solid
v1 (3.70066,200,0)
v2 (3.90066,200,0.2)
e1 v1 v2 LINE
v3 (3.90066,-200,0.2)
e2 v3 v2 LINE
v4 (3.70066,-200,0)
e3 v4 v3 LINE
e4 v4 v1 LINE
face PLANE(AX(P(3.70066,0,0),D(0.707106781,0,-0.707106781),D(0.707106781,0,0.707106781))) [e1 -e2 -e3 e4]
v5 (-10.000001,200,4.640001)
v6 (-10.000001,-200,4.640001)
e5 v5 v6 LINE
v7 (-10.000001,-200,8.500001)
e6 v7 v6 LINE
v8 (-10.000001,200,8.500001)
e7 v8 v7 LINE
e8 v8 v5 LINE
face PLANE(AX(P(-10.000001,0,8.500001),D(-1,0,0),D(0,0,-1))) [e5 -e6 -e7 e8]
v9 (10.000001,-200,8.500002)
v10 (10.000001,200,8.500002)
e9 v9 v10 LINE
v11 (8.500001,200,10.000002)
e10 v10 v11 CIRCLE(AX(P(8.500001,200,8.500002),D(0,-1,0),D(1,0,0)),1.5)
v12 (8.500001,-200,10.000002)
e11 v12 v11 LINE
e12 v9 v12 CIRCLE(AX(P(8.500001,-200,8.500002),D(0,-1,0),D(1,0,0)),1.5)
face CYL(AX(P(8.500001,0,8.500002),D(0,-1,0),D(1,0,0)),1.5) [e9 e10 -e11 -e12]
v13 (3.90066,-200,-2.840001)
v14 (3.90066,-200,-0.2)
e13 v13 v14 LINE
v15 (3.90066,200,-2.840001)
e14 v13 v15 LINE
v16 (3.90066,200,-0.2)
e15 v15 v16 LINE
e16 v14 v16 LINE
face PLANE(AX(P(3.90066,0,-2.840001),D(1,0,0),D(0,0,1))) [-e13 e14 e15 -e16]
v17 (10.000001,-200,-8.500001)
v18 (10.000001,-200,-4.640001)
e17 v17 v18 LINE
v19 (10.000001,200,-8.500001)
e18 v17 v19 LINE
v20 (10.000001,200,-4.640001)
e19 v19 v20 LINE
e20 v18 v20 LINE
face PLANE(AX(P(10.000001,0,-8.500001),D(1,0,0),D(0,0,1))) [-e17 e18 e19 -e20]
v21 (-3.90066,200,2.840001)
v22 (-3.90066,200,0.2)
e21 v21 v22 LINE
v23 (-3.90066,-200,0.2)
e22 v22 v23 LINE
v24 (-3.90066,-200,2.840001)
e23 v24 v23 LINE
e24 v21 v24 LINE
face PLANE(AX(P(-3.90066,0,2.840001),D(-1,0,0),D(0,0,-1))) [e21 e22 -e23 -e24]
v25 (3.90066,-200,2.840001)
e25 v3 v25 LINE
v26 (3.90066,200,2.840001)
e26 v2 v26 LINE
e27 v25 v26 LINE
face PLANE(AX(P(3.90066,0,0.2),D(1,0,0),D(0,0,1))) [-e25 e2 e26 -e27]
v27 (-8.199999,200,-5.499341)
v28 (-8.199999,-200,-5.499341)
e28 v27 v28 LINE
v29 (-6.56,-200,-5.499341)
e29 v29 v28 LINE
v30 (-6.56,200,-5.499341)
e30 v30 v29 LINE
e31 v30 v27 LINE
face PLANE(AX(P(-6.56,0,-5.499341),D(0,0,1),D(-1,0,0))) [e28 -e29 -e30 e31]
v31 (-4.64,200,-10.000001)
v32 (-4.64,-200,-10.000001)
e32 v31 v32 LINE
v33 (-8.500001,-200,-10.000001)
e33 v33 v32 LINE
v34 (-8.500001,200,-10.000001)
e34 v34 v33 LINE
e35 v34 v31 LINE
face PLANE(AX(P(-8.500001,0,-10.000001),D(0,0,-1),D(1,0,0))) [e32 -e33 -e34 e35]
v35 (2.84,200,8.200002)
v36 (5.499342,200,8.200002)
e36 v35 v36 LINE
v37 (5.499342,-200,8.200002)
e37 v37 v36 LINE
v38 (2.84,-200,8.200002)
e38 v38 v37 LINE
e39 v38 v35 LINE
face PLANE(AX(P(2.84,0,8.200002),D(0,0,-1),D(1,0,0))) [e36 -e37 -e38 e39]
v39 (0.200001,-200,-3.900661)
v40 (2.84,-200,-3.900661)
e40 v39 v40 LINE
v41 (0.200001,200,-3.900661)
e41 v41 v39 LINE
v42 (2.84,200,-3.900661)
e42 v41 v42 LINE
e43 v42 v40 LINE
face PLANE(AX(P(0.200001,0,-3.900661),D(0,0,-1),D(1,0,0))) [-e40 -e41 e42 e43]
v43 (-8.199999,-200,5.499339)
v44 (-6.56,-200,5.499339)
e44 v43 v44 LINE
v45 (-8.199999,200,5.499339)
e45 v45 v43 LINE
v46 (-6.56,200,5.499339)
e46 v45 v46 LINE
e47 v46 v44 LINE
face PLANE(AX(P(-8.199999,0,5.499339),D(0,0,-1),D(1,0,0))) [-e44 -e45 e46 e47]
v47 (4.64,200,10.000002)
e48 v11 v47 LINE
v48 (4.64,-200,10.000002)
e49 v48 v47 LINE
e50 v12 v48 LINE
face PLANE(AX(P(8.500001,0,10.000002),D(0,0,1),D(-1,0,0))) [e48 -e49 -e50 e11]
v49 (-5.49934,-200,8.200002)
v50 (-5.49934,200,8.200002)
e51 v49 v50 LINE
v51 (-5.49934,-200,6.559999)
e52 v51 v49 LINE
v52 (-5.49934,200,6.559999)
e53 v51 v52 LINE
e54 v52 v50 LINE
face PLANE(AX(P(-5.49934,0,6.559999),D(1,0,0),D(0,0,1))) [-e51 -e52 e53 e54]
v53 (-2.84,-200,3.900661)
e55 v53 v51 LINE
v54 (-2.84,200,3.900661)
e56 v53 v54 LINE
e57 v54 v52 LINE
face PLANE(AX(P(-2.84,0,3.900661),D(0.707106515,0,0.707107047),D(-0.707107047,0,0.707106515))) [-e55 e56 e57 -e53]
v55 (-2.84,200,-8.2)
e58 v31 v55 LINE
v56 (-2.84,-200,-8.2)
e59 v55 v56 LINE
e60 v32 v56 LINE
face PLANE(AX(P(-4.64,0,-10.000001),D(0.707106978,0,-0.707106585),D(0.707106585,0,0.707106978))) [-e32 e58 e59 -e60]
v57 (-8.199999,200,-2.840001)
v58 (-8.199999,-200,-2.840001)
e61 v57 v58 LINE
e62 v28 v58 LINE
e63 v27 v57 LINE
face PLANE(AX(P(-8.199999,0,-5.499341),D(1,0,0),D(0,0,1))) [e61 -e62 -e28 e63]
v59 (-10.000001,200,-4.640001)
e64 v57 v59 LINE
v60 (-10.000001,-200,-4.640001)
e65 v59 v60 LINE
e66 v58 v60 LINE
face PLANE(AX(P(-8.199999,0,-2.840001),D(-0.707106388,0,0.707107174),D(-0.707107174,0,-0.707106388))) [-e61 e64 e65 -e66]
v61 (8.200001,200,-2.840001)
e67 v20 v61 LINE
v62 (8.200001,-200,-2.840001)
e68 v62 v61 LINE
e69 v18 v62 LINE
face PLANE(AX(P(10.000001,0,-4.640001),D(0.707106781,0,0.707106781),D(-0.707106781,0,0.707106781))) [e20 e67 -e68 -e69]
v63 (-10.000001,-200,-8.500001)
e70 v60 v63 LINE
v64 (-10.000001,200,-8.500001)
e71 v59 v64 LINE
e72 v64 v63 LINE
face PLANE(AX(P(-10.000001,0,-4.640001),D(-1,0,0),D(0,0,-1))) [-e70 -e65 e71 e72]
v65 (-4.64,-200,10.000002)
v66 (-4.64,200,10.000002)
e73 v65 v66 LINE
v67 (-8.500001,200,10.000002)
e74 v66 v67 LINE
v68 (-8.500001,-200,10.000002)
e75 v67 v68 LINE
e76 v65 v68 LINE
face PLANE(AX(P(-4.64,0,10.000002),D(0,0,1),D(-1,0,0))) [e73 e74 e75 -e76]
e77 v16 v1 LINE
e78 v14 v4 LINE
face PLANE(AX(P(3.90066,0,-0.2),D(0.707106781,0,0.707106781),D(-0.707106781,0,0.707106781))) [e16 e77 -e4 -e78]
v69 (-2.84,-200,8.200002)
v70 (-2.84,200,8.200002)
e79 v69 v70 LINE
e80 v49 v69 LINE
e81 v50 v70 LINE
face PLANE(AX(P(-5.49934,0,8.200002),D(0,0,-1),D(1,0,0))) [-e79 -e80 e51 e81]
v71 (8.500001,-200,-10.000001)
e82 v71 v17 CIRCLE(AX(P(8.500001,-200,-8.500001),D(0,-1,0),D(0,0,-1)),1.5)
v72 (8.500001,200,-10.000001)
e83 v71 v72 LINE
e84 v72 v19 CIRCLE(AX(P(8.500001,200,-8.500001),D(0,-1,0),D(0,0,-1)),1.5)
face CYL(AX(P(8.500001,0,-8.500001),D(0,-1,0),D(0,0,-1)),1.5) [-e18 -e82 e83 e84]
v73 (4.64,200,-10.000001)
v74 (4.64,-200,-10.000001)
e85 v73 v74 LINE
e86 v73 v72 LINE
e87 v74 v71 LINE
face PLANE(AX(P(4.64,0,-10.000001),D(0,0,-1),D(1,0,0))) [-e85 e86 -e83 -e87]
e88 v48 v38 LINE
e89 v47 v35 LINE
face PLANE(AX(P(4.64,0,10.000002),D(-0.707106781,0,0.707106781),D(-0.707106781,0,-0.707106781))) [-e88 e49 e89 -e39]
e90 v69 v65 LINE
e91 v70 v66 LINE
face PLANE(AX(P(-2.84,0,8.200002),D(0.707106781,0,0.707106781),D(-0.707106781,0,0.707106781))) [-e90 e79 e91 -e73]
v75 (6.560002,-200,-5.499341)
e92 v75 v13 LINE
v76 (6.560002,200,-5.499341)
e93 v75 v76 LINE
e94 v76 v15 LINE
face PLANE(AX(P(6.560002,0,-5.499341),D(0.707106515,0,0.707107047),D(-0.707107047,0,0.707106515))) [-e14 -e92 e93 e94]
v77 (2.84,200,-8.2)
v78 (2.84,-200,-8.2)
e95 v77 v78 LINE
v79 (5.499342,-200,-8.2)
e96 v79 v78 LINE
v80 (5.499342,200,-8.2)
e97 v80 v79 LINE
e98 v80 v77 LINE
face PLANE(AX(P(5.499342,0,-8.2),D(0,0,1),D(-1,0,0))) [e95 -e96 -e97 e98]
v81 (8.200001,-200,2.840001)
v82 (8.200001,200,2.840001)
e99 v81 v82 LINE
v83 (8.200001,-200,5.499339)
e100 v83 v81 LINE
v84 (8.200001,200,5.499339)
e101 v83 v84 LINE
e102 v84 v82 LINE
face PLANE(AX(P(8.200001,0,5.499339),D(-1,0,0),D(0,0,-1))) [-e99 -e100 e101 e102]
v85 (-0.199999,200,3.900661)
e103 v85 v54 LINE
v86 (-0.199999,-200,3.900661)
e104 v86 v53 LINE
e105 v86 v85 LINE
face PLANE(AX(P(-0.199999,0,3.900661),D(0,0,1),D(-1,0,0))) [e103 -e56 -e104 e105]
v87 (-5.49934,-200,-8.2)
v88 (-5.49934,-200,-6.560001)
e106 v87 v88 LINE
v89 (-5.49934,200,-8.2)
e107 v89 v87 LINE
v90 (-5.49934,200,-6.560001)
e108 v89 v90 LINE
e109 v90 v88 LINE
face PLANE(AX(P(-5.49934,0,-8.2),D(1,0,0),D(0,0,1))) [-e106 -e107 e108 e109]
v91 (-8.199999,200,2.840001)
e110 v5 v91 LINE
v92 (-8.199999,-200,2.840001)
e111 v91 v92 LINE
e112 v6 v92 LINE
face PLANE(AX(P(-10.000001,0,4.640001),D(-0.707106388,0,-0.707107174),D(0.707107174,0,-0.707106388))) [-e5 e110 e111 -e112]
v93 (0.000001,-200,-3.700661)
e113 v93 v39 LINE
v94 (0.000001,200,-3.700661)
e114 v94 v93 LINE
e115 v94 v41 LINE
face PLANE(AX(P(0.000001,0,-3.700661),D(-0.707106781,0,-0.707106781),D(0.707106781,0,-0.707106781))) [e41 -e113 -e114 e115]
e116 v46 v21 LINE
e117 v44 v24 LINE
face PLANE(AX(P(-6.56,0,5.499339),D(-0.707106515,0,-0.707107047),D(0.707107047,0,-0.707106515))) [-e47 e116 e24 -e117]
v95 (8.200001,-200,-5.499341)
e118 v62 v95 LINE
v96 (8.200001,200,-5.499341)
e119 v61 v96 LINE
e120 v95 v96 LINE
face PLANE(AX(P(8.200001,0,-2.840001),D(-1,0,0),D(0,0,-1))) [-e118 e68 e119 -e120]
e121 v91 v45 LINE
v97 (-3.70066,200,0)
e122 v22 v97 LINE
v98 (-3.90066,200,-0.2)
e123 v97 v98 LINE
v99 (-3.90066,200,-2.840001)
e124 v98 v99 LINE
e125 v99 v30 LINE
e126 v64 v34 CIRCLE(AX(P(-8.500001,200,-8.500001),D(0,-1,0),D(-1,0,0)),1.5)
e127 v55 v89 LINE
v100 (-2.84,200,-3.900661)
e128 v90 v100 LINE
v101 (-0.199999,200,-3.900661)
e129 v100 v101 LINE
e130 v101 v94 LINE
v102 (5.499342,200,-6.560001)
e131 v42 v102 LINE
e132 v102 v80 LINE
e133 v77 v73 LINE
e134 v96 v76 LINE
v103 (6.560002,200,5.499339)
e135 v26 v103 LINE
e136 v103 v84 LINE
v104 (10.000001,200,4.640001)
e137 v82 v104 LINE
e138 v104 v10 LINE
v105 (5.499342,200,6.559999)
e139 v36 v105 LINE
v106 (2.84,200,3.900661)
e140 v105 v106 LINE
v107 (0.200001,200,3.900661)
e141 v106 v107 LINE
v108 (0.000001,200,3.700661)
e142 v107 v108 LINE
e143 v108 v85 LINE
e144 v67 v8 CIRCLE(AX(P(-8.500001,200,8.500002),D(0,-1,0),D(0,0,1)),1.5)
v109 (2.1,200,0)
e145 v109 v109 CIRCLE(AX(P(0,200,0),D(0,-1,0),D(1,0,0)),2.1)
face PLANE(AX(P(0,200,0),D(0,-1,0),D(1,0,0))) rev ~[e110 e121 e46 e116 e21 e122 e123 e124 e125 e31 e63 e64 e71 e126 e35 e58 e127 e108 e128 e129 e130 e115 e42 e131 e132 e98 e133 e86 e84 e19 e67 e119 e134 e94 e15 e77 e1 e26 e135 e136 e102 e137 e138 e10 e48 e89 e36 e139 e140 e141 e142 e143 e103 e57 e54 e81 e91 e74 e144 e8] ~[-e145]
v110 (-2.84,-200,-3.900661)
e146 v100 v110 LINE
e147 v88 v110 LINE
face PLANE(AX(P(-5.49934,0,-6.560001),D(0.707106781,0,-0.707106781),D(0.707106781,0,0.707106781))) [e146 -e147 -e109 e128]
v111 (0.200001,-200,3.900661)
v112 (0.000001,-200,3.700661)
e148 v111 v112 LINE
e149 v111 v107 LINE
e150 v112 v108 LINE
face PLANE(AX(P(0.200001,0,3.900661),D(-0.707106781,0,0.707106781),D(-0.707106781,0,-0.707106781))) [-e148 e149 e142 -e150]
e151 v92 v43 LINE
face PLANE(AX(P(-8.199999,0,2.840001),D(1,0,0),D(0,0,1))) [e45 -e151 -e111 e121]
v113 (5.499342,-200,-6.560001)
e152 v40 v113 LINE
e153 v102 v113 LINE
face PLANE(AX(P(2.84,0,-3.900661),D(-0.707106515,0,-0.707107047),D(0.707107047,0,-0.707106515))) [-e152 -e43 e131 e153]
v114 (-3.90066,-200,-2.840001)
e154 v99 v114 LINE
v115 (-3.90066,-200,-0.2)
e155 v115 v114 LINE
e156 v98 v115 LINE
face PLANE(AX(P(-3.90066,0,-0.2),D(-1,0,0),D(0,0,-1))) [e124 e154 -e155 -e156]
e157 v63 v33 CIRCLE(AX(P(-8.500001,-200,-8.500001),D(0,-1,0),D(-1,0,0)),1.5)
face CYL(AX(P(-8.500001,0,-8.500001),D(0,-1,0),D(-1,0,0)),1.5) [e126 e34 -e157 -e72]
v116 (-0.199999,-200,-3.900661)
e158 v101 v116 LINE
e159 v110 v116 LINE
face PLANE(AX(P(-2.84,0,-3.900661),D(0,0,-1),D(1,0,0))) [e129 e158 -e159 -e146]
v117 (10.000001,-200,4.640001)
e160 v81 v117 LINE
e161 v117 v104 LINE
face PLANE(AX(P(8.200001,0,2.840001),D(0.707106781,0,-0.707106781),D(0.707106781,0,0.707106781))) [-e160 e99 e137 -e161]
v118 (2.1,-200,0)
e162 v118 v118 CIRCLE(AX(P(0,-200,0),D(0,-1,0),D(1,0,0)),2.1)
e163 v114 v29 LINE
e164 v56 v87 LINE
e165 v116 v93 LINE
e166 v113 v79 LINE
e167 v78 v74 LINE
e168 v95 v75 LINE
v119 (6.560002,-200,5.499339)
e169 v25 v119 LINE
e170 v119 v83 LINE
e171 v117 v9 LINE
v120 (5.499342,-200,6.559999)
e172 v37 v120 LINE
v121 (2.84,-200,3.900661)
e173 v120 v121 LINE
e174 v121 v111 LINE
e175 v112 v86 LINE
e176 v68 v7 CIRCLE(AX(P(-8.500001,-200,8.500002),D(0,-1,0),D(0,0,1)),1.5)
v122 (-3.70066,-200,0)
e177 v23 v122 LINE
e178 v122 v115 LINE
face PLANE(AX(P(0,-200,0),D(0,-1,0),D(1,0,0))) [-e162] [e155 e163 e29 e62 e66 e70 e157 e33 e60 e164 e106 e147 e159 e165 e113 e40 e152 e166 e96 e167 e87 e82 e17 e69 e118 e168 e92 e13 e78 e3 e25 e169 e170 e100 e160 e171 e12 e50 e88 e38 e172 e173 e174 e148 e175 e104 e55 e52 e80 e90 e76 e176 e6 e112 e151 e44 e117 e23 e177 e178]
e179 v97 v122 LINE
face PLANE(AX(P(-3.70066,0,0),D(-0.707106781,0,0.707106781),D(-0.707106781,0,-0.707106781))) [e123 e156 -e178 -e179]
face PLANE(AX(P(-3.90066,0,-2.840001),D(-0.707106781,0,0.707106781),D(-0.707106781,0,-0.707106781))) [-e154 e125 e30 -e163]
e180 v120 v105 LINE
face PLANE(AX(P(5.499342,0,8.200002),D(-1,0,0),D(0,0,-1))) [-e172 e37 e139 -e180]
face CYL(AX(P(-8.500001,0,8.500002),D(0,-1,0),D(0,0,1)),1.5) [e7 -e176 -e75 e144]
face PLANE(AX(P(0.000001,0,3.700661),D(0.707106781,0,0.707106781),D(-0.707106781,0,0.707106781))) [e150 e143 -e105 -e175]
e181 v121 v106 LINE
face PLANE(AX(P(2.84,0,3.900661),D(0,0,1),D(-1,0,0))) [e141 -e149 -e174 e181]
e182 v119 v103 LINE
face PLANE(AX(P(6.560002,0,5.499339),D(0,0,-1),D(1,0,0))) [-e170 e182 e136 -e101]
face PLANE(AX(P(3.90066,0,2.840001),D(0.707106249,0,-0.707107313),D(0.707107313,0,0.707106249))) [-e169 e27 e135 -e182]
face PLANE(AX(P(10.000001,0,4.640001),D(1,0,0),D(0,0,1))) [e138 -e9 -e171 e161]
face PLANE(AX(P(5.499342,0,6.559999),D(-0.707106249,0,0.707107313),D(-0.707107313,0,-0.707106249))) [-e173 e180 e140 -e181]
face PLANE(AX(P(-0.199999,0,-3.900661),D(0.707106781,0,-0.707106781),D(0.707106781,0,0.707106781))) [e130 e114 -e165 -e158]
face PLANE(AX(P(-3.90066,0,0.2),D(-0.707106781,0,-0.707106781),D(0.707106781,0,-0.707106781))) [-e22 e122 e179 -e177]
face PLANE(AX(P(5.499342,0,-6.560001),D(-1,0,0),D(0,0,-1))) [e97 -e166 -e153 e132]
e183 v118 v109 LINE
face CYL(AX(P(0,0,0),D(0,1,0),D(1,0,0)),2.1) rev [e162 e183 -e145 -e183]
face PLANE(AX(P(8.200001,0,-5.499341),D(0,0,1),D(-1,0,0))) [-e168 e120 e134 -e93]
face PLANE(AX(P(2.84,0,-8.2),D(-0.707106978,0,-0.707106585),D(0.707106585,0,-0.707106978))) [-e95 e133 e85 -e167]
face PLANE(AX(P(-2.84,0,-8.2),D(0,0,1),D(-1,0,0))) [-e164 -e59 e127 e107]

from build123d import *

# Parameters (mm, degrees)
F0_R     = 2.1
F1_DEPTH = 200


# Not quite as in the source:
# - ends of sketch curves that miss each other by under 0.0002 mm in the source are joined


with BuildPart() as f1:
    # F0 (on Front) → F1 (new body, symmetric)
    with BuildSketch(Plane.XZ):
        with BuildLine():
            Line((-4.64, 10.000002), (-8.500001, 10.000002))
            ThreePointArc((-8.500001, 10.000002), (-9.5606615253, 9.5606618182), (-10.000001, 8.500001))
            Line((-10.000001, 8.500001), (-10.000001, 4.640001))
            Line((-10.000001, 4.640001), (-8.199999, 2.840001))
            Line((-8.199999, 2.840001), (-8.199999, 5.499339))
            Line((-8.199999, 5.499339), (-6.56, 5.499339))
            Line((-6.56, 5.499339), (-3.90066, 2.840001))
            Line((-3.90066, 2.840001), (-3.90066, 0.2))
            Line((-3.90066, 0.2), (-3.70066, 0))
            Line((-3.70066, 0), (-3.90066, -0.2))
            Line((-3.90066, -0.2), (-3.90066, -2.840001))
            Line((-3.90066, -2.840001), (-6.56, -5.499341))
            Line((-6.56, -5.499341), (-8.199999, -5.499341))
            Line((-8.199999, -5.499341), (-8.199999, -2.840001))
            Line((-8.199999, -2.840001), (-10.000001, -4.640001))
            Line((-10.000001, -4.640001), (-10.000001, -8.500001))
            ThreePointArc((-10.000001, -8.500001), (-9.5606608182, -9.5606615253), (-8.500001, -10.000001))
            Line((-8.500001, -10.000001), (-4.64, -10.000001))
            Line((-4.64, -10.000001), (-2.84, -8.2))
            Line((-2.84, -8.2), (-5.49934, -8.2))
            Line((-5.49934, -8.2), (-5.49934, -6.560001))
            Line((-5.49934, -6.560001), (-2.84, -3.900661))
            Line((-2.84, -3.900661), (-0.199999, -3.900661))
            Line((-0.199999, -3.900661), (1e-06, -3.700661))
            Line((1e-06, -3.700661), (0.200001, -3.900661))
            Line((0.200001, -3.900661), (2.84, -3.900661))
            Line((2.84, -3.900661), (5.499342, -6.560001))
            Line((5.499342, -6.560001), (5.499342, -8.2))
            Line((5.499342, -8.2), (2.84, -8.2))
            Line((2.84, -8.2), (4.64, -10.000001))
            Line((4.64, -10.000001), (8.500001, -10.000001))
            ThreePointArc((8.500001, -10.000001), (9.5606611718, -9.5606611718), (10.000001, -8.500001))
            Line((10.000001, -8.500001), (10.000001, -4.640001))
            Line((10.000001, -4.640001), (8.200001, -2.840001))
            Line((8.200001, -2.840001), (8.200001, -5.499341))
            Line((8.200001, -5.499341), (6.560002, -5.499341))
            Line((6.560002, -5.499341), (3.90066, -2.840001))
            Line((3.90066, -2.840001), (3.90066, -0.2))
            Line((3.90066, -0.2), (3.70066, 0))
            Line((3.70066, 0), (3.90066, 0.2))
            Line((3.90066, 0.2), (3.90066, 2.840001))
            Line((3.90066, 2.840001), (6.560002, 5.499339))
            Line((6.560002, 5.499339), (8.200001, 5.499339))
            Line((8.200001, 5.499339), (8.200001, 2.840001))
            Line((8.200001, 2.840001), (10.000001, 4.640001))
            Line((10.000001, 4.640001), (10.000001, 8.500002))
            ThreePointArc((10.000001, 8.500002), (9.5606611718, 9.5606621718), (8.500001, 10.000002))
            Line((8.500001, 10.000002), (4.64, 10.000002))
            Line((4.64, 10.000002), (2.84, 8.200002))
            Line((2.84, 8.200002), (5.499342, 8.200002))
            Line((5.499342, 8.200002), (5.499342, 6.559999))
            Line((5.499342, 6.559999), (2.84, 3.900661))
            Line((2.84, 3.900661), (0.200001, 3.900661))
            Line((0.200001, 3.900661), (1e-06, 3.700661))
            Line((1e-06, 3.700661), (-0.199999, 3.900661))
            Line((-0.199999, 3.900661), (-2.84, 3.900661))
            Line((-2.84, 3.900661), (-5.49934, 6.559999))
            Line((-5.49934, 6.559999), (-5.49934, 8.200002))
            Line((-5.49934, 8.200002), (-2.84, 8.200002))
            Line((-2.84, 8.200002), (-4.64, 10.000002))
        make_face()
        with Locations((1e-06, 0)):
            Circle(F0_R, mode=Mode.SUBTRACT)
    extrude(amount=F1_DEPTH, both=True)


solid = f1.part
